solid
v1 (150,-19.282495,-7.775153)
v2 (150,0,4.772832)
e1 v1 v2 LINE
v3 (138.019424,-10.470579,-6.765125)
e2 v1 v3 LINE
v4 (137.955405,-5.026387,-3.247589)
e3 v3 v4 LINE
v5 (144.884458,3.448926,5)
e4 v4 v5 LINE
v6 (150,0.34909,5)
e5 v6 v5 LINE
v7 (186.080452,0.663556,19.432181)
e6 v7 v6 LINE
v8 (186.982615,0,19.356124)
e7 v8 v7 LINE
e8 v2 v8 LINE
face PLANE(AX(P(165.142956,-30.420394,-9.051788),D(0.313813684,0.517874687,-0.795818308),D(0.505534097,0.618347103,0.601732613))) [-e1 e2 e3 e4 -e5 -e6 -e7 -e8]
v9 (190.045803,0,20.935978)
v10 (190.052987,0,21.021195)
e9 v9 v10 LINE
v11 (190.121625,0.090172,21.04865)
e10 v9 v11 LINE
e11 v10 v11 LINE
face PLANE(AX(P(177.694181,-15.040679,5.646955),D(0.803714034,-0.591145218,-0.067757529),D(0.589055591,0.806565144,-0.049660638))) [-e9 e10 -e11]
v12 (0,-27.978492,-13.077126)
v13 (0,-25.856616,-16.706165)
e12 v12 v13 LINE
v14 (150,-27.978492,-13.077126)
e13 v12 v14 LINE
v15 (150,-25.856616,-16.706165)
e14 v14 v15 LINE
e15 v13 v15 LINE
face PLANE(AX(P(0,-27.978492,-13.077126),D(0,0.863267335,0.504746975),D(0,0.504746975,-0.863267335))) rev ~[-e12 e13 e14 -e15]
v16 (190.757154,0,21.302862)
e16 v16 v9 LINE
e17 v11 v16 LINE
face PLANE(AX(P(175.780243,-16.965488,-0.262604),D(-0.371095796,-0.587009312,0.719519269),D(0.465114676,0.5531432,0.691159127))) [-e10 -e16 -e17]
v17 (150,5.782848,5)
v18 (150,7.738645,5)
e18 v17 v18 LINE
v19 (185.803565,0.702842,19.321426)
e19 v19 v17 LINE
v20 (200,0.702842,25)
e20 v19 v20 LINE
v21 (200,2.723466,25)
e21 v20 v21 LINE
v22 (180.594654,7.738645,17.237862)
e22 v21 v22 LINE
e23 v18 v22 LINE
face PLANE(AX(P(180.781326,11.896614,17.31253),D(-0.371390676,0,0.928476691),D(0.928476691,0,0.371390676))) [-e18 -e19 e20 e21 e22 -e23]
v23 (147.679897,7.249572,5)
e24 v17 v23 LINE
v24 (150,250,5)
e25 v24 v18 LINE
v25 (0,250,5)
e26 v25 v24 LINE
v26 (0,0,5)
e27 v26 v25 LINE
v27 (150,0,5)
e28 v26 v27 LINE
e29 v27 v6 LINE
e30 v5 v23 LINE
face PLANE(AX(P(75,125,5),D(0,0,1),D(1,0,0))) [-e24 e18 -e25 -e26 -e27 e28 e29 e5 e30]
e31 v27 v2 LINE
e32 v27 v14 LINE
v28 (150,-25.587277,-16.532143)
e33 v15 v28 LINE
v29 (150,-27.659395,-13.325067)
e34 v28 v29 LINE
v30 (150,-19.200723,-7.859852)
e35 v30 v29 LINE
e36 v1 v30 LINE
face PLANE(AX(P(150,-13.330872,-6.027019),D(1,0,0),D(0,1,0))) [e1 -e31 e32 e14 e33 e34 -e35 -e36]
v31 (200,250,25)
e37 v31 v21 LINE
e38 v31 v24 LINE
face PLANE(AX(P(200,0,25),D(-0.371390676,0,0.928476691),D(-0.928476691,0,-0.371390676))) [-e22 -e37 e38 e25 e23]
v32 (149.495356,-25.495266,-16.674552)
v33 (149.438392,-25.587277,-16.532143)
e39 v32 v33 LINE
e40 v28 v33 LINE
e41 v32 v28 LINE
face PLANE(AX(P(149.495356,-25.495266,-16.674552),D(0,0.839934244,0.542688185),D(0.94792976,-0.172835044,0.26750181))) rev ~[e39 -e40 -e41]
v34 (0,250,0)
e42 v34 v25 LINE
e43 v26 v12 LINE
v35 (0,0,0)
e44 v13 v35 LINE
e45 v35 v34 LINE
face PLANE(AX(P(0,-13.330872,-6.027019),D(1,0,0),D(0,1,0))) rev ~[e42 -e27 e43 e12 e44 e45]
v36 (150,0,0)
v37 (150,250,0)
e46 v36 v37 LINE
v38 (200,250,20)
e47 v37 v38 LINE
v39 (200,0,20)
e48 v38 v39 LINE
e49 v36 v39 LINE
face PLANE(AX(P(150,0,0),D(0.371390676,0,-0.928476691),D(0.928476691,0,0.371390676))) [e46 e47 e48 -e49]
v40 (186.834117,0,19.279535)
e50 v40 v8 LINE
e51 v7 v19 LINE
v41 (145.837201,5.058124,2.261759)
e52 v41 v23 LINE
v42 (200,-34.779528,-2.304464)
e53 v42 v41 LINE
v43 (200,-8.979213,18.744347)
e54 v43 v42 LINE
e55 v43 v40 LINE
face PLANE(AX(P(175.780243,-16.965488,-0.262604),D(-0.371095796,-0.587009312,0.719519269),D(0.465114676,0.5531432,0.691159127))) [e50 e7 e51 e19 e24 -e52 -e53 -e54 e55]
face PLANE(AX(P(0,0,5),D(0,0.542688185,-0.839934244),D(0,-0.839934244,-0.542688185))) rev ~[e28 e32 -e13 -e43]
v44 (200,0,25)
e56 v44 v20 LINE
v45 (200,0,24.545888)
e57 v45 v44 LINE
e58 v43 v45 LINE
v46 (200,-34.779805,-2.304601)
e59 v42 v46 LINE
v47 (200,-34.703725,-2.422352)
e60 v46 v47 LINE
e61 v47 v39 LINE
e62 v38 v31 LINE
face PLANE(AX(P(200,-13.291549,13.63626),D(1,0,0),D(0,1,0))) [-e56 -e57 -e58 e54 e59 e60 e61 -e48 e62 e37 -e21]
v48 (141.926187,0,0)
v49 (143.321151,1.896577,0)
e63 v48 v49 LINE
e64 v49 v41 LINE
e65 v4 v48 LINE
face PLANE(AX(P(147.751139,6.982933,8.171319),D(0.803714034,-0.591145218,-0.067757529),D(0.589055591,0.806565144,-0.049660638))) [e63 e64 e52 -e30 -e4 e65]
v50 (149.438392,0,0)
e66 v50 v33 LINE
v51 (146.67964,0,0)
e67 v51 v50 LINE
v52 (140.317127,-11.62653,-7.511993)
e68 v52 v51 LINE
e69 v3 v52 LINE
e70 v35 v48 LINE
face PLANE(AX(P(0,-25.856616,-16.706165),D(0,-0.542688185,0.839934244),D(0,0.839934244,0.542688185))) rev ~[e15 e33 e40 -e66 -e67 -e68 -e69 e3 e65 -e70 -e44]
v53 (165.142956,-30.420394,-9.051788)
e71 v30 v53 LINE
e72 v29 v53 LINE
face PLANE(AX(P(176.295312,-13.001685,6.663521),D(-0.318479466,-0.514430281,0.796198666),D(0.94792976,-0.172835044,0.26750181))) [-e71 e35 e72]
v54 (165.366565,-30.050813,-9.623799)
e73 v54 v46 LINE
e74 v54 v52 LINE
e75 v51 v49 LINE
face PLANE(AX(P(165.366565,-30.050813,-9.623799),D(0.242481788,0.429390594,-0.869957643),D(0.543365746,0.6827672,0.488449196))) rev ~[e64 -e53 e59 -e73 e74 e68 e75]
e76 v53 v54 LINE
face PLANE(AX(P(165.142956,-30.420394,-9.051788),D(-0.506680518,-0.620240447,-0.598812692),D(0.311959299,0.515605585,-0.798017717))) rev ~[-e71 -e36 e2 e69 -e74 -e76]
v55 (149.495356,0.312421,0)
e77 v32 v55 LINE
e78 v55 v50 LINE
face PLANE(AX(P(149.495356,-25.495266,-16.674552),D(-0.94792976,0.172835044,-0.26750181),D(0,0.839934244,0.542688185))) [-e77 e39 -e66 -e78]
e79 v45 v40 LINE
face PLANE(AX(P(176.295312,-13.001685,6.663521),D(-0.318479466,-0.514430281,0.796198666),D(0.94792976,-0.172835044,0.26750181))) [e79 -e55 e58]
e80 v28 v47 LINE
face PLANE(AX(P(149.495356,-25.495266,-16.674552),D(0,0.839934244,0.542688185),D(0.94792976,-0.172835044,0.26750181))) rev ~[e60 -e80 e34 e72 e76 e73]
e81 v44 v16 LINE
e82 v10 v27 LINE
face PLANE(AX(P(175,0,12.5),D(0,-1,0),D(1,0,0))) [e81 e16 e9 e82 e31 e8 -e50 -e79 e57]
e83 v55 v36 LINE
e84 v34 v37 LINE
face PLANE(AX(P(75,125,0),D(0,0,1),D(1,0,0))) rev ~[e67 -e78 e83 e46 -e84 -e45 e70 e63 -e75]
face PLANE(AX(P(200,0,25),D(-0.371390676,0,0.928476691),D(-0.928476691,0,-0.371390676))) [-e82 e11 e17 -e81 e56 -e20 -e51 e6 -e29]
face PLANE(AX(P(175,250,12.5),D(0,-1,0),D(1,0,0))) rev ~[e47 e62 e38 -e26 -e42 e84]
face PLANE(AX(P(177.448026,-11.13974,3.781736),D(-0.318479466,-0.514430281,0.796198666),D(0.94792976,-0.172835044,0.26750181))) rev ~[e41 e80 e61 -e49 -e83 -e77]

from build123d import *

# Parameters (mm, degrees)
F0_W      = 150
F0_H      = 250
F1_DEPTH  = 5
F3_DEPTH  = 150
F5_DEPTH  = 250
F7_W      = 58.9762479067
F7_H      = 46.3181659579
F8_DEPTH  = 3.61943
F9_W      = 66.3050051284
F9_H      = 23.7932279706
F10_DEPTH = 25
F11_W     = 9.7743958235
F11_H     = 36.3947637379
F12_DEPTH = 25
F13_W     = 91.9819101691
F13_H     = 53.4567786381
F14_DEPTH = 25
F17_DEPTH = 42.79442
F18_DEPTH = 37.25584


with BuildPart() as f1:
    # F0 (on Top) → F1 (new body)
    with BuildSketch(Plane.XY):
        with Locations((75, 125)):
            Rectangle(F0_W, F0_H)
    extrude(amount=F1_DEPTH)

    # F2 (on Right) → F3 (join)
    with BuildSketch(Plane.YZ):
        Polygon((-25.8566159755, -16.7061649263), (0, 0), (0, 5), (-27.978492185, -13.0771259965), align=None)
    extrude(amount=F3_DEPTH)

    # F4 (on Front) → F5 (join)
    with BuildSketch(Plane.XZ):
        Polygon((150, 5), (150, 0), (200, 20), (200, 25), align=None)
    extrude(amount=-F5_DEPTH)

    # F7 (on 3pt) → F8 (join)
    with BuildSketch(Plane(origin=(15.2143755699, 24.5753222078, -38.0359389247), x_dir=(0.9479297598, -0.1728350436, 0.2675018096), z_dir=(-0.3184794663, -0.5144302811, 0.7961986658))):
        with Locations((171.1452230811, -7.3043461889)):
            Rectangle(F7_W, F7_H)
    extrude(amount=F8_DEPTH)

    # F9 (on face) → F10 (cut)
    with BuildSketch(Plane(origin=(18.9655172414, 0, -47.4137931034), x_dir=(0.9284766909, 0, 0.3713906764), z_dir=(-0.3713906764, 0, 0.9284766909))):
        with Locations((174.2809595788, 11.8966139853)):
            Rectangle(F9_W, F9_H)
    extrude(amount=F10_DEPTH, mode=Mode.SUBTRACT)

    # F11 (on face) → F12 (cut)
    with BuildSketch(Plane.XY.offset(5)):
        with Locations((145.1128020883, 18.197381869)):
            Rectangle(F11_W, F11_H)
    extrude(amount=F12_DEPTH, mode=Mode.SUBTRACT)

    # F13 (on face) → F14 (cut)
    with BuildSketch(Plane.YZ.offset(200)):
        with Locations((-13.2915489376, 13.6362598278)):
            Rectangle(F13_W, F13_H)
    extrude(amount=F14_DEPTH, mode=Mode.SUBTRACT)

    # F16 (on face) → F17 (cut)
    with BuildSketch(Plane(origin=(121.6211489037, -89.4544048238, -10.2533341545), x_dir=(0.5890555913, 0.8065651439, -0.0496606377), z_dir=(0.8037140341, -0.5911452179, -0.0677575293))):
        Polygon((66.8091401458, 0), (89.8736044765, 14.5051842555), (116.4209321141, 42.6778681576), align=None)
    extrude(amount=F17_DEPTH, mode=Mode.SUBTRACT)

    # F18 (cut): a face of the model
    f18_faces = [f1.faces().sort_by_distance(p)[0] for p in [
        (175.9683447832, -17.0287264276, 2.5203105636),
    ]]
    extrude(f18_faces, amount=-F18_DEPTH, mode=Mode.SUBTRACT)


solid = f1.part
